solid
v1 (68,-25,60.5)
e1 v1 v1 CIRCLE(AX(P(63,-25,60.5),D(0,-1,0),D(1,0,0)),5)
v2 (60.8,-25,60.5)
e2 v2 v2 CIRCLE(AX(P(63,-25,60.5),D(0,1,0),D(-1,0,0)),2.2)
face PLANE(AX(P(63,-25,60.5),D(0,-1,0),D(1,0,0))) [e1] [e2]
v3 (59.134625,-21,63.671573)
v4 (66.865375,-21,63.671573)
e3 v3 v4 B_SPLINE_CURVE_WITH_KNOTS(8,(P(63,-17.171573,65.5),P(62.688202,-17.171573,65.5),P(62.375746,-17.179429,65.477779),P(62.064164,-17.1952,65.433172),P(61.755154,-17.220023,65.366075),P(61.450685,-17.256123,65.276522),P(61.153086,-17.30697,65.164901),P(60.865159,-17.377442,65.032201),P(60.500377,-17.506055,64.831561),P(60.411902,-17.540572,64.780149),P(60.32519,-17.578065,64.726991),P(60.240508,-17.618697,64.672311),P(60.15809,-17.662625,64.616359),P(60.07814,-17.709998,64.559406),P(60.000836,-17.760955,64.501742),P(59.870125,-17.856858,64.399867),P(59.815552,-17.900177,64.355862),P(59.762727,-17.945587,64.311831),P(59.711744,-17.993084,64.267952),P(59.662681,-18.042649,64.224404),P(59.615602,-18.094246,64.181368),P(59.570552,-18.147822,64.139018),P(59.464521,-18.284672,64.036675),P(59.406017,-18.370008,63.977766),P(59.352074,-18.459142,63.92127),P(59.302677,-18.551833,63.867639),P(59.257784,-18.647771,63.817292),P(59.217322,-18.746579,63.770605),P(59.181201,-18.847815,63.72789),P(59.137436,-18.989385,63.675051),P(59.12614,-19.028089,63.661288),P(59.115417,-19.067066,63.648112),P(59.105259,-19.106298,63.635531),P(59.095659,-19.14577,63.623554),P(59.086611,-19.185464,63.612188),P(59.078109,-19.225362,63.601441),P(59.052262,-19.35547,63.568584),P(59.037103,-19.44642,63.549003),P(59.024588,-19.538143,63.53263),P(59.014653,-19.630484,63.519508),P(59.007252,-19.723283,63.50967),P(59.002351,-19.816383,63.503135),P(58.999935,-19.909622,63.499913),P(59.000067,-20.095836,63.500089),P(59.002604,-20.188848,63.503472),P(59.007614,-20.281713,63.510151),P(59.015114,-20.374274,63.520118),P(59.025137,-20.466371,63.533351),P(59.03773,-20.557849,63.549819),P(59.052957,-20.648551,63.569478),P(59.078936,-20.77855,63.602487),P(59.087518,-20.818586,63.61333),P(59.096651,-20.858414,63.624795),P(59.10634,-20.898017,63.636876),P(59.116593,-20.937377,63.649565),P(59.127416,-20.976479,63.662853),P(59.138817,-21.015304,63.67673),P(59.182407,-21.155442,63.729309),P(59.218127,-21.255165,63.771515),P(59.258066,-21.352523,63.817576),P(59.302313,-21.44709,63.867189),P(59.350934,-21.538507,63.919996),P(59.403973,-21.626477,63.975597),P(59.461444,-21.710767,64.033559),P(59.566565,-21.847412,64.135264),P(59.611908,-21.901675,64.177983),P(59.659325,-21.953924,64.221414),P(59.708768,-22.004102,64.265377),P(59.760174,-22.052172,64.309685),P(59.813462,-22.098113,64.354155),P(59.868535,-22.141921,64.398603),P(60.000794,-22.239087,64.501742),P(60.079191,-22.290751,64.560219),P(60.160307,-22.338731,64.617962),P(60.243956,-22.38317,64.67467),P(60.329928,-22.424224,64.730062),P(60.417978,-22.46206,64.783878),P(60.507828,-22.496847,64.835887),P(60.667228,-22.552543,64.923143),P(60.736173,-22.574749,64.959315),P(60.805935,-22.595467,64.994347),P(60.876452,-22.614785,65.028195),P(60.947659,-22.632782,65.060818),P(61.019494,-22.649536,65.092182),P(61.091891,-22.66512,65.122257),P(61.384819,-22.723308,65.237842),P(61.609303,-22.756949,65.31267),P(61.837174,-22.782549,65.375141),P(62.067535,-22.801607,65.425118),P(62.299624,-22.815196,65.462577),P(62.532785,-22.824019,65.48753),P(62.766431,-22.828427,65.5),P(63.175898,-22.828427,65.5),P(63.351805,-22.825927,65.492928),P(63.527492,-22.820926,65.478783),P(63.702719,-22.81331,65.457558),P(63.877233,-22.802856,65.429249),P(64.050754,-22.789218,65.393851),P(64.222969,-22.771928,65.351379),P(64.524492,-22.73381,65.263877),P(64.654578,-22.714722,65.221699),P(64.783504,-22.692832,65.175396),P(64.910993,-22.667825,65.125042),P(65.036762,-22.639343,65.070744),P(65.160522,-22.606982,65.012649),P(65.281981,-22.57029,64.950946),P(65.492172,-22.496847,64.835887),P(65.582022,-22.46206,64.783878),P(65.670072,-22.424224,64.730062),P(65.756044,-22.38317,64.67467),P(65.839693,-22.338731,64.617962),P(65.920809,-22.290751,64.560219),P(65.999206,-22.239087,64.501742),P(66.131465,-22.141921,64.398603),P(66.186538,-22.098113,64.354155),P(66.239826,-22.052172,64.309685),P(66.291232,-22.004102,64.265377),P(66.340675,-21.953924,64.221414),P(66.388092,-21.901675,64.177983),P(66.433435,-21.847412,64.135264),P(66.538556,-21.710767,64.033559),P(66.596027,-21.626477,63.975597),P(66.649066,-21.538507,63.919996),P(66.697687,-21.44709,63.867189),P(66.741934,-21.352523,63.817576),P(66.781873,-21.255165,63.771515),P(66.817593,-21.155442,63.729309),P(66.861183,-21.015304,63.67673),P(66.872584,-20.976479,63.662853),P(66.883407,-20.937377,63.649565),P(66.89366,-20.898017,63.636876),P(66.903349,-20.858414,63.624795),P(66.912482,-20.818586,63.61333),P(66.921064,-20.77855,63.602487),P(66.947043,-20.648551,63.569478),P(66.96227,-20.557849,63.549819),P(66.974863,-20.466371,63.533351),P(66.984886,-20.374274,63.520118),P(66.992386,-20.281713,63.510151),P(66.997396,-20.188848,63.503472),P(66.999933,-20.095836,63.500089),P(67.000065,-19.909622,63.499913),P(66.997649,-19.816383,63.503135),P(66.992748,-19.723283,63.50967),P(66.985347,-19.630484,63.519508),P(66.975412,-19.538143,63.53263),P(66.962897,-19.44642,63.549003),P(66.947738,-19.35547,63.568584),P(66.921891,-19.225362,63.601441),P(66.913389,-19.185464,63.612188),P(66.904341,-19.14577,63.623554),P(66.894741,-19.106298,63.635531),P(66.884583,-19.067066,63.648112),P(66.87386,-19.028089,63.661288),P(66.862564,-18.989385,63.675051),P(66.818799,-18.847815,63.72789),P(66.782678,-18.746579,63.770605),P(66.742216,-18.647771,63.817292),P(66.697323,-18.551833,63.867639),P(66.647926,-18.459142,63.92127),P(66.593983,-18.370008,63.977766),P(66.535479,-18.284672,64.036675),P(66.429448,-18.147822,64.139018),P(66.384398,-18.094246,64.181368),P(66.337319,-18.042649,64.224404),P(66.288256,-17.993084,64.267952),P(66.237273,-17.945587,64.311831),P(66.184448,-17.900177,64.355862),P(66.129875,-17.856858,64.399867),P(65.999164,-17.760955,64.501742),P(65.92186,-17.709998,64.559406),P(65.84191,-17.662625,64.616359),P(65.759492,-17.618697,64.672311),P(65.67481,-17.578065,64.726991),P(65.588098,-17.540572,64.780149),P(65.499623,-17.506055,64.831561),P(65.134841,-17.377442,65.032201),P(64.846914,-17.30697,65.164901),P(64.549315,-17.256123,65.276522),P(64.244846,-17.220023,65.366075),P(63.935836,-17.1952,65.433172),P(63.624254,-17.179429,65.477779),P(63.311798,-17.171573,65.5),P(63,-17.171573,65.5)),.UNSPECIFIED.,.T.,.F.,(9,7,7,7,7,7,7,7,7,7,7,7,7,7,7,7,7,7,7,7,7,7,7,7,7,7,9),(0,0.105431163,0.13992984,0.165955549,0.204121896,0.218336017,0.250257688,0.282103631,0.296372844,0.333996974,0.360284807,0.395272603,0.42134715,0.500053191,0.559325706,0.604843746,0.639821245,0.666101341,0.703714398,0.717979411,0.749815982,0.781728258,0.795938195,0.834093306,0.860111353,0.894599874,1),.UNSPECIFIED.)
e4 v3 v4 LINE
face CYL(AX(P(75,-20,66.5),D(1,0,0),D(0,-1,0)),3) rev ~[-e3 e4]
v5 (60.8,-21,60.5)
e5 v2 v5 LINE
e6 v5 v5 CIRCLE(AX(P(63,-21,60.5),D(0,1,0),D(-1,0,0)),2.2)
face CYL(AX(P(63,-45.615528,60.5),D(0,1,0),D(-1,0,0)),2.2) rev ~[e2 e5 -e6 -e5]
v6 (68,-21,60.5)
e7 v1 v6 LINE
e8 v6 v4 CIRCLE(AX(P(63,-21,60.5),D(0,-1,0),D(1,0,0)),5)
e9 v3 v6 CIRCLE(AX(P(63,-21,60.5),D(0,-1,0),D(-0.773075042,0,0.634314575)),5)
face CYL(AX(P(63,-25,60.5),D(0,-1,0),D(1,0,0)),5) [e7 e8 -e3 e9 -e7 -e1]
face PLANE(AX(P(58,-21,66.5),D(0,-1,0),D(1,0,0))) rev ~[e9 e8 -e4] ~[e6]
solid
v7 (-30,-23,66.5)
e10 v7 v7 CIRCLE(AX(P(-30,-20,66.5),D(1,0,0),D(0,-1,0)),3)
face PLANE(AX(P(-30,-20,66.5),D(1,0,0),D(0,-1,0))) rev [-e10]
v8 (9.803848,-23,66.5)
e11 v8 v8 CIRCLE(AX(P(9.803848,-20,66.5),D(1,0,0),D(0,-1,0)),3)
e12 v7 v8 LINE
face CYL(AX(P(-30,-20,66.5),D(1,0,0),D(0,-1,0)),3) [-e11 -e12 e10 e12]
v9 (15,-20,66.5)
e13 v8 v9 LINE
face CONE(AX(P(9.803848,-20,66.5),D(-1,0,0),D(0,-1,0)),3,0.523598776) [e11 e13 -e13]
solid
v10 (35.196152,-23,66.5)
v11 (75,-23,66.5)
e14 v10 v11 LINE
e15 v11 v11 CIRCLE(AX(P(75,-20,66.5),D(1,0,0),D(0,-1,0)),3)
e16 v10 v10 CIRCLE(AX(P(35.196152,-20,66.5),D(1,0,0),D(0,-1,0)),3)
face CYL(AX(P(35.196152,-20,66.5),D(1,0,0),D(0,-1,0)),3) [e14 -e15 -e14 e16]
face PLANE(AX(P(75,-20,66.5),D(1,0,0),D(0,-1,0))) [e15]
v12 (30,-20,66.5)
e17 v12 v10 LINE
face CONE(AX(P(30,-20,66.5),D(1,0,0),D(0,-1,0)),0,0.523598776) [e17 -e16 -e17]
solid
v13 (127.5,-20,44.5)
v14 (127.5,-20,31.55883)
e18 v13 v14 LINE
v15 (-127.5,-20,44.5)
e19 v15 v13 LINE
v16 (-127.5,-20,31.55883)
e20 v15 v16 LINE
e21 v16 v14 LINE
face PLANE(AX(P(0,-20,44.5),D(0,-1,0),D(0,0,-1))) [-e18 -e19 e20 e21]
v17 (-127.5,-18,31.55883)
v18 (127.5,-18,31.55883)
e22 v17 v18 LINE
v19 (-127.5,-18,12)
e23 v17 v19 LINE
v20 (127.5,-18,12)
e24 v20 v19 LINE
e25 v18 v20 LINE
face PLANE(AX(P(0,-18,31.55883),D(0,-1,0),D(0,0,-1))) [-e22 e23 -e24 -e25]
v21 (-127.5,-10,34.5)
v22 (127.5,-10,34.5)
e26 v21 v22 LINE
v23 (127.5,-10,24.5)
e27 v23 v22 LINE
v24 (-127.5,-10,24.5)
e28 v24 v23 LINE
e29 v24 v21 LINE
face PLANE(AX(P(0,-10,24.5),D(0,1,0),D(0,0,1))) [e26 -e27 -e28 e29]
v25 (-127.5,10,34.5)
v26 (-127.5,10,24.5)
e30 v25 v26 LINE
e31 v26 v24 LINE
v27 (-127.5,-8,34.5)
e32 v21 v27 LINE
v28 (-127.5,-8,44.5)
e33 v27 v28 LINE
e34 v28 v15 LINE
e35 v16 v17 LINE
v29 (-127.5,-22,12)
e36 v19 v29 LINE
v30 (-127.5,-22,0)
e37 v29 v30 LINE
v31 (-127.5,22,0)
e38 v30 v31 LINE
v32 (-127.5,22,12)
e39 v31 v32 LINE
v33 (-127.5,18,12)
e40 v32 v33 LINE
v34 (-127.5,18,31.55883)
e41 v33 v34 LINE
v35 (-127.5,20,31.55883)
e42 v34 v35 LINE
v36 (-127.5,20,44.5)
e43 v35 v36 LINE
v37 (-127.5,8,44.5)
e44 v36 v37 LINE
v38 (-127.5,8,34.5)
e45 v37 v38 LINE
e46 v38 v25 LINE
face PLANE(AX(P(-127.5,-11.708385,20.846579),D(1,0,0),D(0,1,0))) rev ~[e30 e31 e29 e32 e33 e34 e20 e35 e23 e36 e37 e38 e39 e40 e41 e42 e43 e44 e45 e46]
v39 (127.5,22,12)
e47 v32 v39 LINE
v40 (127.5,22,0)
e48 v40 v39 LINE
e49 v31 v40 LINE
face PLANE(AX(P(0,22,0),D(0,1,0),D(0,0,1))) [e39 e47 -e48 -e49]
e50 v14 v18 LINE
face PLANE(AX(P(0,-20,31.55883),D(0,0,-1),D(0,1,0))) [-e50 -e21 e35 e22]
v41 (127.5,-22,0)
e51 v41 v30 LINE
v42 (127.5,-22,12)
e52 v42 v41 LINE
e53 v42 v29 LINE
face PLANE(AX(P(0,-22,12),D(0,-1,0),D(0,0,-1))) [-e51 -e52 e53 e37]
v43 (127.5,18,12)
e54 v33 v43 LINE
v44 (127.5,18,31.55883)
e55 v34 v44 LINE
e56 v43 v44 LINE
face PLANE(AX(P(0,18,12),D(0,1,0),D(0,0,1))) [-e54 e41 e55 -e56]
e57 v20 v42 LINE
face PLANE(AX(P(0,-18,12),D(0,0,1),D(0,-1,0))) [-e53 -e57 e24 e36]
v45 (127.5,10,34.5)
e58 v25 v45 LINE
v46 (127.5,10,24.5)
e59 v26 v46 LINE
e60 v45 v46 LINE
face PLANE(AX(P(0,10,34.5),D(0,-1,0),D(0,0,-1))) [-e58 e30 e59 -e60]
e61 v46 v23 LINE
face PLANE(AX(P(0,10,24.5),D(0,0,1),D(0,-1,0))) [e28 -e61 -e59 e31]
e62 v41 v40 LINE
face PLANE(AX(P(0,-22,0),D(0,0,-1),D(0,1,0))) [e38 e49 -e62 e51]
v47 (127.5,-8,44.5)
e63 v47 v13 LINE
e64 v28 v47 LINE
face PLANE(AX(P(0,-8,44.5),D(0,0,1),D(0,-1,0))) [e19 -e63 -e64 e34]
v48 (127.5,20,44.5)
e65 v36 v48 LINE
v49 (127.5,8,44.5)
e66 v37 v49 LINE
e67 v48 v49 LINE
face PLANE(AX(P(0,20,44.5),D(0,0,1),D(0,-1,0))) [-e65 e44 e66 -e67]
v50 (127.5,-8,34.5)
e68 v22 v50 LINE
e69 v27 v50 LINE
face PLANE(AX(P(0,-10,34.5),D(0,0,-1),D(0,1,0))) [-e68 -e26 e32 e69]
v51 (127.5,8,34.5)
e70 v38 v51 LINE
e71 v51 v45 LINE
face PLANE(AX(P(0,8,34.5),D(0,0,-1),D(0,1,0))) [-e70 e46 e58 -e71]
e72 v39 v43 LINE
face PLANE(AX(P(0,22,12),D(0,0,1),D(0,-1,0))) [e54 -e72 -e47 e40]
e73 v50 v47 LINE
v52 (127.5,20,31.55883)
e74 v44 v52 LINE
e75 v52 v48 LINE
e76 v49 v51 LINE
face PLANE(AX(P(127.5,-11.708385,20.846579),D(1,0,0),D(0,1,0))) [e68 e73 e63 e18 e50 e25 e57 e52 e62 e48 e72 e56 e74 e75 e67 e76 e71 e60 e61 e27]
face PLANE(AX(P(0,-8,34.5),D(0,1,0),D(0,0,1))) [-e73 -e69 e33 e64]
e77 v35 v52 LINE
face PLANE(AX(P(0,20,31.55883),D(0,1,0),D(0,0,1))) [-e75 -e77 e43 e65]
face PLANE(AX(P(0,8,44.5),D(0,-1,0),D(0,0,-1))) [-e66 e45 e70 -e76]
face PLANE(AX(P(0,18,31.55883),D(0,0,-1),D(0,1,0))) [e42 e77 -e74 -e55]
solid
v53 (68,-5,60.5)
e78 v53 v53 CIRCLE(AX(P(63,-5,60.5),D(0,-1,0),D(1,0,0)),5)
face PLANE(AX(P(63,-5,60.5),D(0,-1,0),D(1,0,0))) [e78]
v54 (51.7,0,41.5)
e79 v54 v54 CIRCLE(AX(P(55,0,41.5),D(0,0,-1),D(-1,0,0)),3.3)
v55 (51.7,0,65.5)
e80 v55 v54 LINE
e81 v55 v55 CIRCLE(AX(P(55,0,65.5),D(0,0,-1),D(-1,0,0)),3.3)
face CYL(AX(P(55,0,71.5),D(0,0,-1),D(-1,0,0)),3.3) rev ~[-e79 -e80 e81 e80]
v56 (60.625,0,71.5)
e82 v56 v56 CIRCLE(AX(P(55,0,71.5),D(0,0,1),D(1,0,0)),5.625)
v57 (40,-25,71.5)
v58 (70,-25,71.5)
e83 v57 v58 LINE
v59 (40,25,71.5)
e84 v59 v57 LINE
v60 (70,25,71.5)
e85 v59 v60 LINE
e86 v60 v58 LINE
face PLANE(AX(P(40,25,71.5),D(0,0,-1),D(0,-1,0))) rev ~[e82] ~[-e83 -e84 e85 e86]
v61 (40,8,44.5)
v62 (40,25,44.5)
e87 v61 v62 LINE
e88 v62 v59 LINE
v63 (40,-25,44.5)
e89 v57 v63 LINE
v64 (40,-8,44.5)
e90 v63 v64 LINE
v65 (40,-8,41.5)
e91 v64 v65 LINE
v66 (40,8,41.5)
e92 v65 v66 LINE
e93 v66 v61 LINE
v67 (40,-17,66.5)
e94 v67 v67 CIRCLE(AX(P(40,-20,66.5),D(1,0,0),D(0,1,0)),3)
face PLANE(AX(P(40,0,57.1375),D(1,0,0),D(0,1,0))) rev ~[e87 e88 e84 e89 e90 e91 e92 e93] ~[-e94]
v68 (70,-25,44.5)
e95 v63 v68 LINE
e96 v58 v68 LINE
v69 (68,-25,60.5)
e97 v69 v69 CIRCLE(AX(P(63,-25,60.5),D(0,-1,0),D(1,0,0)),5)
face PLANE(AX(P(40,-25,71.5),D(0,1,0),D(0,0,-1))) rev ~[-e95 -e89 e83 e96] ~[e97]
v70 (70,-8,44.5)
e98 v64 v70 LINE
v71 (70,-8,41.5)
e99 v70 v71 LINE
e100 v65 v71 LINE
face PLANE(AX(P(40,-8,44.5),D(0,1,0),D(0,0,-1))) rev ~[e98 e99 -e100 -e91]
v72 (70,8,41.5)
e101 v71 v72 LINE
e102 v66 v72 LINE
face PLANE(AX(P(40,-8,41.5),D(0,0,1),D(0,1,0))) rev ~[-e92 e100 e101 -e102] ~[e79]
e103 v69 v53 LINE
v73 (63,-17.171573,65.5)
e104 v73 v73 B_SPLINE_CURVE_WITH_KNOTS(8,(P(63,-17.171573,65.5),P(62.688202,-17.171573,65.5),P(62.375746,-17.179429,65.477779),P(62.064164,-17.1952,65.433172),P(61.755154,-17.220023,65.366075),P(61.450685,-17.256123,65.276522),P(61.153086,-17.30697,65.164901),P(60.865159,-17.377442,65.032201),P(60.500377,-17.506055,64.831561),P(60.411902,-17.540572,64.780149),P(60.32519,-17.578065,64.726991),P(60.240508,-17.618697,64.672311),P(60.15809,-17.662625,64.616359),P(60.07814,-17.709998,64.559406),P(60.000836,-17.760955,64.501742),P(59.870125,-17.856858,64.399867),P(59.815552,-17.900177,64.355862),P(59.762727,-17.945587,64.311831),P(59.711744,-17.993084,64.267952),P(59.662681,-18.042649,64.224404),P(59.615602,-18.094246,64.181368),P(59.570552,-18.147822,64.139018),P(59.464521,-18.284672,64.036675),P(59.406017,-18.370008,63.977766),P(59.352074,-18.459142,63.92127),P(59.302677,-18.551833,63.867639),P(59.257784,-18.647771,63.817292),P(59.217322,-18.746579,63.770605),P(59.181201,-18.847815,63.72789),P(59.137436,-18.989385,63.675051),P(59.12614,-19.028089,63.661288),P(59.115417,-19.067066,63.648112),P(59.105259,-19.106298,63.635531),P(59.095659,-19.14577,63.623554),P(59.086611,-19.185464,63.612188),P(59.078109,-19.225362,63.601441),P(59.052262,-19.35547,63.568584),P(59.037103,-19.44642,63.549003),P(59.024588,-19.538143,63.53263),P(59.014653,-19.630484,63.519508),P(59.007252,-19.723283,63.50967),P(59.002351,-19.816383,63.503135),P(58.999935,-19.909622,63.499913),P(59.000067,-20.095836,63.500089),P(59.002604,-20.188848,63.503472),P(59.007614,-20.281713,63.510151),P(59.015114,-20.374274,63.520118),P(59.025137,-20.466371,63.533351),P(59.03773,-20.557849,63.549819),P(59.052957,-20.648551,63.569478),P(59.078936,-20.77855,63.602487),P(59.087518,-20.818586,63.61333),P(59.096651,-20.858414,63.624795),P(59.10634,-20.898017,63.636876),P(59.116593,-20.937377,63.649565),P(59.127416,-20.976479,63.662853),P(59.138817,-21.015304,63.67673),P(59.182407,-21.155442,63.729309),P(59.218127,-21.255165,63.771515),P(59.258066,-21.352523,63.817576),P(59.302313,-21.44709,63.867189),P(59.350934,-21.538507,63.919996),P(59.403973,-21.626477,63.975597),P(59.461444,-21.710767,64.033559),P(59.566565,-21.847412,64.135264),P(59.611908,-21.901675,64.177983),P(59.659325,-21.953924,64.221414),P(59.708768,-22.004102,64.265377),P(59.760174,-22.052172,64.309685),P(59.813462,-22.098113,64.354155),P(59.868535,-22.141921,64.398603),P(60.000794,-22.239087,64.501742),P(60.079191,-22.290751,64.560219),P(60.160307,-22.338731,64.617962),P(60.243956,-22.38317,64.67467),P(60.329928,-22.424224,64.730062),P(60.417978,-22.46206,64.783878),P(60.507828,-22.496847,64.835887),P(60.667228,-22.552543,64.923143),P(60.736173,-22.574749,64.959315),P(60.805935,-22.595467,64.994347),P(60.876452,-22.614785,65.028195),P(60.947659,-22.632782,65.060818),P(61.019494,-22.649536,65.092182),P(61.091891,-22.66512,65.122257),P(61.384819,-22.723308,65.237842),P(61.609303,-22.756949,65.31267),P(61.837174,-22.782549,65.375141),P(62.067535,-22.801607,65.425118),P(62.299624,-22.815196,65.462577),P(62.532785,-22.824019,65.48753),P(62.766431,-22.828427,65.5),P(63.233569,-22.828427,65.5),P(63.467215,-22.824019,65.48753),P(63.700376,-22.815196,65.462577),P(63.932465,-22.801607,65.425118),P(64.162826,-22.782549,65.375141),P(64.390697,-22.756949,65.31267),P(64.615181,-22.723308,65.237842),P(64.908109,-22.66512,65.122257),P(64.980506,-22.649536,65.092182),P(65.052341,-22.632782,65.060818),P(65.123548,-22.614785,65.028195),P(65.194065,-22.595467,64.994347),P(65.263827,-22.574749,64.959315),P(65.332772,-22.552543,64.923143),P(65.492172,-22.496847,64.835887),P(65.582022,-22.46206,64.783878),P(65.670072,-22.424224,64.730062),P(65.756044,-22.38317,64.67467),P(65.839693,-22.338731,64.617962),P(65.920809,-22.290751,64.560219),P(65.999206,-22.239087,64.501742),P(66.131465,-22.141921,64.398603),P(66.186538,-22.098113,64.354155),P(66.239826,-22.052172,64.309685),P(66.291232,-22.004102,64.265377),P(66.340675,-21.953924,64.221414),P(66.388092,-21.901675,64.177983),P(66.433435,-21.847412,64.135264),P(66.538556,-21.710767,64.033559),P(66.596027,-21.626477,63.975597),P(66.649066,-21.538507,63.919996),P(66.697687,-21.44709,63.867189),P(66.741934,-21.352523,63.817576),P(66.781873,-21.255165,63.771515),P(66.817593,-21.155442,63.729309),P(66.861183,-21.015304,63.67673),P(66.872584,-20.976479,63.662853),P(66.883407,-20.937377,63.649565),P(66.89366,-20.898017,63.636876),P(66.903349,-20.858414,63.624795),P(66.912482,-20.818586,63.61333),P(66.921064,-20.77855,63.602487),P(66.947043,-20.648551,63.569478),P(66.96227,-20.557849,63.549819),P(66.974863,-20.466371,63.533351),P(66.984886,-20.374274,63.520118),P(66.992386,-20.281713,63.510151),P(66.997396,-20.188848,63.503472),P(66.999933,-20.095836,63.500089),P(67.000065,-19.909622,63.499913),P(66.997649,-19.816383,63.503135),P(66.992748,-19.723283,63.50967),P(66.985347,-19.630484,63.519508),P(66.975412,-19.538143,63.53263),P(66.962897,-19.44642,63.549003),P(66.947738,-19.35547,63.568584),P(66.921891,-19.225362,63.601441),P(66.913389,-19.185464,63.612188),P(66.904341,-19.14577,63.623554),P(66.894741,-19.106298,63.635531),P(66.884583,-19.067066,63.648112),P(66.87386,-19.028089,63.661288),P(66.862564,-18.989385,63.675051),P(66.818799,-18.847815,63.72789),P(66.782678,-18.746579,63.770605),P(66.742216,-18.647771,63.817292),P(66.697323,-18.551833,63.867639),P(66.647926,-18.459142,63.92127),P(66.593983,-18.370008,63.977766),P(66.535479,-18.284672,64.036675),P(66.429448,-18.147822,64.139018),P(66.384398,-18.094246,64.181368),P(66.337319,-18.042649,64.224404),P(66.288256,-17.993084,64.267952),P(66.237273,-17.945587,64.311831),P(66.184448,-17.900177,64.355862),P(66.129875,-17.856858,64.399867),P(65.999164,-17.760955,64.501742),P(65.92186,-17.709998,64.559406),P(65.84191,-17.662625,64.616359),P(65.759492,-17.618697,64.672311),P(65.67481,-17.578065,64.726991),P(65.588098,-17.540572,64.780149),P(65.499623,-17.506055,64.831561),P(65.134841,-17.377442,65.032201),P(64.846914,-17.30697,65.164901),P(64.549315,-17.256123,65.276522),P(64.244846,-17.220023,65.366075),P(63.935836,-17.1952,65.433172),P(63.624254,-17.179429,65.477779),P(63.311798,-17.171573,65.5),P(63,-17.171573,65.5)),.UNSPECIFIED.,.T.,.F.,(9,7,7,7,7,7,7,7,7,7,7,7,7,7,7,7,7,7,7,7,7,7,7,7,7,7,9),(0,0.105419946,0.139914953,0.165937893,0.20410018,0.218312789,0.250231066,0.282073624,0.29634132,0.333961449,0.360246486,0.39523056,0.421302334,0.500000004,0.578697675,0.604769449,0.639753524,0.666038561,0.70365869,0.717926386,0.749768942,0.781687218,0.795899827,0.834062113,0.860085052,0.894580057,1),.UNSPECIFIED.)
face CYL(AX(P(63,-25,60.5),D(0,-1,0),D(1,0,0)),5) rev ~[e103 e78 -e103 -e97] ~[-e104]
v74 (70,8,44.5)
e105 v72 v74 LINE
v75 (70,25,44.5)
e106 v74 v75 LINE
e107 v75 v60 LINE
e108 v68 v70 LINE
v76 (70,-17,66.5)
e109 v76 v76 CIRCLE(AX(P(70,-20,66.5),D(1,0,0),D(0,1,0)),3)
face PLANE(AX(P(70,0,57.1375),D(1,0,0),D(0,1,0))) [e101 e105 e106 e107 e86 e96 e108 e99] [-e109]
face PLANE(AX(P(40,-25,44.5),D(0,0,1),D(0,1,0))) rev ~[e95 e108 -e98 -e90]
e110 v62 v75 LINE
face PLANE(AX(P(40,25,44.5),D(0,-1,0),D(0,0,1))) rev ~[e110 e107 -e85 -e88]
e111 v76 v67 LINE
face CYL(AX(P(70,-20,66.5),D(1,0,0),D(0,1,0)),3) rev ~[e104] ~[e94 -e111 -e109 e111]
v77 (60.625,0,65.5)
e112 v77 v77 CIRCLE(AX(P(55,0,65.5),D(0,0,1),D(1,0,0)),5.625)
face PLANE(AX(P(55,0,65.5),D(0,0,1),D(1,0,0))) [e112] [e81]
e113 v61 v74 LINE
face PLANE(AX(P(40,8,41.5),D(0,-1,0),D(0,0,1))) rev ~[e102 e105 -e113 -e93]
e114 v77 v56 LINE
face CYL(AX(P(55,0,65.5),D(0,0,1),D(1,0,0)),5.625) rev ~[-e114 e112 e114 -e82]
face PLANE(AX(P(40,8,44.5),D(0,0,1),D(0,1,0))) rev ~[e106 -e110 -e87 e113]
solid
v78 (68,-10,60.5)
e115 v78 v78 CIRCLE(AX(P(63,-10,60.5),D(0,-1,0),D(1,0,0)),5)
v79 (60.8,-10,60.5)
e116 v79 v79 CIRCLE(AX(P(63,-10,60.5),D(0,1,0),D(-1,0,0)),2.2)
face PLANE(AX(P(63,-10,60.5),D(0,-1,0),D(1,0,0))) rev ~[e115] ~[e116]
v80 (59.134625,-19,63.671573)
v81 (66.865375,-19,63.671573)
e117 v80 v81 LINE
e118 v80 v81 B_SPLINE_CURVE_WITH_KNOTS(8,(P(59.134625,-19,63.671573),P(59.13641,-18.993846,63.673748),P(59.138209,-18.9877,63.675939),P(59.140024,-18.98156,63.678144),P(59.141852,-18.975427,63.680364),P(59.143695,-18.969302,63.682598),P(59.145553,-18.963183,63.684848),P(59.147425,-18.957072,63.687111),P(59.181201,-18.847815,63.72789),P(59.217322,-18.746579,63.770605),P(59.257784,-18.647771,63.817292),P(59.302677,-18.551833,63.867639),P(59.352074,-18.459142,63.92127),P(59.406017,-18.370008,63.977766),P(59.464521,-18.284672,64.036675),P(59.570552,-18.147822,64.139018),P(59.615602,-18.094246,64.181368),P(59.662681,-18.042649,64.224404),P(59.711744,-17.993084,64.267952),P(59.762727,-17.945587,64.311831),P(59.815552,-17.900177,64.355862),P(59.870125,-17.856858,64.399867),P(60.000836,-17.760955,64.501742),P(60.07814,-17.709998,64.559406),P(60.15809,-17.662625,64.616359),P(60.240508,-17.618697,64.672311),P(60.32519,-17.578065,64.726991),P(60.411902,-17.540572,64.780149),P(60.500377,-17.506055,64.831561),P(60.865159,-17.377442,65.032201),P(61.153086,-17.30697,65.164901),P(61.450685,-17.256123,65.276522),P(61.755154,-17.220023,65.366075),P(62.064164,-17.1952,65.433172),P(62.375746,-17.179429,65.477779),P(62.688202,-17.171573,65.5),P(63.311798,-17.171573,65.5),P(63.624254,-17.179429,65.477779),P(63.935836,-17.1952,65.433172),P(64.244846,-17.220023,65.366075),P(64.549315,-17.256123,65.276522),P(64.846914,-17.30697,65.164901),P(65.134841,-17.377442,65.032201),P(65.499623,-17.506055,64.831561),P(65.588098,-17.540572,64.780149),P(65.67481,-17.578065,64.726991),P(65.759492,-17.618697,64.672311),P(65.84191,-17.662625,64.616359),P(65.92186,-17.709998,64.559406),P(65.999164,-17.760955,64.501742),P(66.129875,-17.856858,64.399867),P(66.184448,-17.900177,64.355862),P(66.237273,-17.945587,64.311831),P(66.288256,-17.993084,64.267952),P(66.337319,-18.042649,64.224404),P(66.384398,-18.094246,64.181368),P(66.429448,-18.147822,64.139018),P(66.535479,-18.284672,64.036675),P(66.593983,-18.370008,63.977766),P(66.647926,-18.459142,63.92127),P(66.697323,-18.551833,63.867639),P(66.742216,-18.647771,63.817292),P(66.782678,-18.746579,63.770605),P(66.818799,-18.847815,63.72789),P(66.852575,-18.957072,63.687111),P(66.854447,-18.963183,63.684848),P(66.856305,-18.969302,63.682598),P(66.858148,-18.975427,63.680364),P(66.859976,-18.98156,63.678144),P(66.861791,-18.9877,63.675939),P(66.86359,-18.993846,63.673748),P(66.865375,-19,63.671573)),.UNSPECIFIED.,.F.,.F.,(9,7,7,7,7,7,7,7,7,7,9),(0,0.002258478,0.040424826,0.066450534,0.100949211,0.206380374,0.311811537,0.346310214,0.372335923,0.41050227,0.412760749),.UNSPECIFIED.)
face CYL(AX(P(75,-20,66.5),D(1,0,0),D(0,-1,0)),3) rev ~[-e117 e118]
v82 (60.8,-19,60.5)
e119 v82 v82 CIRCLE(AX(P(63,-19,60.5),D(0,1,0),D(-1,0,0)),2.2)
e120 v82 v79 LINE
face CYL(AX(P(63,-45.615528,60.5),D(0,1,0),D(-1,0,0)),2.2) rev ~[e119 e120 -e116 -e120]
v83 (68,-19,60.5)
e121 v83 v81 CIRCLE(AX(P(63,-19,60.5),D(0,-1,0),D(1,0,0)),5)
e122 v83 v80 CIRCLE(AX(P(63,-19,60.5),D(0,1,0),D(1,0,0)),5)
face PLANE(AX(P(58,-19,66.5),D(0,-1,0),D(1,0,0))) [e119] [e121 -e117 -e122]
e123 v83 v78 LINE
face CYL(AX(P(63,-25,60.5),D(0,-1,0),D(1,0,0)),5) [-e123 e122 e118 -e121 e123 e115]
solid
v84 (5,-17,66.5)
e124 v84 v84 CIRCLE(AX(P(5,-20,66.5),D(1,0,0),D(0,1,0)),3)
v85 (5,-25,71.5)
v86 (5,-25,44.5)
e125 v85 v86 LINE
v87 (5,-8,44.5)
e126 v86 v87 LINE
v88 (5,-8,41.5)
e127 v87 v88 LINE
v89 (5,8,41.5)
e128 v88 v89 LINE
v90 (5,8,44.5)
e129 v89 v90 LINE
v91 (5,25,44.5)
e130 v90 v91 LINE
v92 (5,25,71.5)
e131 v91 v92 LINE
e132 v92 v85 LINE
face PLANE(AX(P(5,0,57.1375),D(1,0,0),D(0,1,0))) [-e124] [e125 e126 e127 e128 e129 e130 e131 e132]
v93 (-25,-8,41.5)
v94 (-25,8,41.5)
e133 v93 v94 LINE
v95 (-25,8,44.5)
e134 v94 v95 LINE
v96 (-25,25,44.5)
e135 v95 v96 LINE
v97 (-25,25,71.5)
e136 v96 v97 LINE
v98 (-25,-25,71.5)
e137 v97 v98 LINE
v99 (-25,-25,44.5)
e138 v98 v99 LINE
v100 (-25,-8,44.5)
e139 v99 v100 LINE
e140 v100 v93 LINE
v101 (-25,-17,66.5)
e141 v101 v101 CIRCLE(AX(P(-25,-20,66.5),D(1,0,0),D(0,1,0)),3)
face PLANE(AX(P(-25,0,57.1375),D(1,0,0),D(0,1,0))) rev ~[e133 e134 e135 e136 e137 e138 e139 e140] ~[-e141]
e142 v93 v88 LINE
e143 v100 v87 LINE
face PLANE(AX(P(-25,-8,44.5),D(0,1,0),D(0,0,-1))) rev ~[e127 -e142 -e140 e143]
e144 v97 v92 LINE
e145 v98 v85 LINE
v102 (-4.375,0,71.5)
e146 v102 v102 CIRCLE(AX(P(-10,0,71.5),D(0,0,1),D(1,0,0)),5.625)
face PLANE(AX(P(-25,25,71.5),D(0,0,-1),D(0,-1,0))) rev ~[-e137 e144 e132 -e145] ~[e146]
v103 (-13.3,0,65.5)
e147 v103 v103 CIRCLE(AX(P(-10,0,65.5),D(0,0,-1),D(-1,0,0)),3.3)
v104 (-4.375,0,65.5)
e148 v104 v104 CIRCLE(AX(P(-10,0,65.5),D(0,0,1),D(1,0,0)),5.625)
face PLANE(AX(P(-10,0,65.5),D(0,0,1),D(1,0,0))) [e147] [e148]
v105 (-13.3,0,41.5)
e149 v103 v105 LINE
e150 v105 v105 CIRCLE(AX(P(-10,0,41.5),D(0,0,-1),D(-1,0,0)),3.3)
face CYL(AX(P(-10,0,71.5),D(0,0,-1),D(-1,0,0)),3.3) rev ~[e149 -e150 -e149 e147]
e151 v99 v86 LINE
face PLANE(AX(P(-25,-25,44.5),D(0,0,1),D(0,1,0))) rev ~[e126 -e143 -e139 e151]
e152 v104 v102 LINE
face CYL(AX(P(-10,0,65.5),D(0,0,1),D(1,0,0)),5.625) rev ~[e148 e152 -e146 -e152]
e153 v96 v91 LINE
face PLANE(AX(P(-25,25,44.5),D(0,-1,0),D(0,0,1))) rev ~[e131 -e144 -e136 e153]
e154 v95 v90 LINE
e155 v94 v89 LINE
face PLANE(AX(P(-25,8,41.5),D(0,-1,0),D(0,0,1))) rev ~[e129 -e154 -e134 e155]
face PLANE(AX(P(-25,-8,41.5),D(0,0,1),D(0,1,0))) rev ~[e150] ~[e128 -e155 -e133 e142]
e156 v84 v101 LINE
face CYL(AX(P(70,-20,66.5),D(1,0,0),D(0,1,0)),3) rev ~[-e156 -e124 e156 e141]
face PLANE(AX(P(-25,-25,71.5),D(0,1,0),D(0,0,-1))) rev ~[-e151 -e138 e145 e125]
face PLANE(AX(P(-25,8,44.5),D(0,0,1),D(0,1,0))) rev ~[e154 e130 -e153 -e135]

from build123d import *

# Parameters (mm, degrees)
F1_DEPTH        = 127.5
F5_DEPTH        = 30
F7_DEPTH        = 30
F8_R            = 3
F9_DEPTH        = 197.501
F10_R           = 3
F11_DEPTH       = 132.501
F14_D           = 6.6
F14_CBORE_D     = 11.25
F14_CBORE_DEPTH = 6
F15_D           = 6.6
F15_CBORE_D     = 11.25
F15_CBORE_DEPTH = 6
F20_R           = 5
F20_R_2         = 2
F21_DEPTH       = 20
F22_DEPTH       = 15
F23_D           = 4.4
F24_DEPTH       = 202.501
F25_W           = 10
F25_H           = 2
F26_DEPTH       = 66.501


with BuildPart() as f1:
    # F0 (on Right) → F1 (new body, symmetric)
    with BuildSketch(Plane.YZ):
        Polygon((-22, 0), (0, 0), (0, 24.5), (-10, 24.5), (-10, 34.5), (-8, 34.5), (-8, 41.5), (-8, 44.5), (-20, 44.5), (-20, 31.5588298937), (-18, 31.5588298937), (-18, 12), (-22, 12), align=None)
        Polygon((0, 24.5), (0, 0), (22, 0), (22, 12), (18, 12), (18, 31.5588298937), (20, 31.5588298937), (20, 44.5), (8, 44.5), (8, 41.5), (8, 34.5), (10, 34.5), (10, 24.5), align=None)
    extrude(amount=F1_DEPTH, both=True)

    # F10 (on face) → F11 (cut, through all)
    with BuildSketch(Plane.YZ.offset(5)):
        with Locations((-20, 66.5)):
            Circle(F10_R)
    extrude(amount=-F11_DEPTH, mode=Mode.SUBTRACT)


with BuildPart() as f5:
    # F4 (on offset) → F5 (new body)
    with BuildSketch(Plane.YZ.offset(40)):
        Polygon((-25, 71.5), (-25, 44.5), (-8, 44.5), (-8, 41.5), (8, 41.5), (8, 44.5), (25, 44.5), (25, 71.5), align=None)
    extrude(amount=F5_DEPTH)


with BuildPart() as f7:
    # F6 (on offset) → F7 (new body)
    with BuildSketch(Plane.YZ.offset(-25)):
        Polygon((-8, 41.5), (8, 41.5), (8, 44.5), (20, 44.5), (25, 44.5), (25, 71.5), (-25, 71.5), (-25, 44.5), (-20, 44.5), (-8, 44.5), align=None)
    extrude(amount=F7_DEPTH)


with BuildPart() as f9_tool:
    # F8 (on face) → F9 (new body, through all)
    with BuildSketch(Plane.YZ.offset(70)):
        with Locations((-20, 66.5)):
            Circle(F8_R)
    extrude(amount=-F9_DEPTH)


with BuildPart() as f5_1:
    add(f5.part)

    # F9: cut by f9_tool
    add(f9_tool.part, mode=Mode.SUBTRACT)

    # F15 (through all)
    with Locations(Plane.XY.offset(71.5)):
        with Locations((55, 0)):
            CounterBoreHole(F15_D / 2, F15_CBORE_D / 2, F15_CBORE_DEPTH)

    # F20 (on face) → F21 (cut)
    with BuildSketch(Plane.XZ.offset(25)):
        with Locations((63, 60.5)):
            Circle(F20_R)
        with Locations((63, 60.5)):
            Circle(F20_R_2, mode=Mode.SUBTRACT)
        with Locations((63, 60.5)):
            Circle(F20_R_2)
    extrude(amount=-F21_DEPTH, mode=Mode.SUBTRACT)


with BuildPart() as f7_1:
    add(f7.part)

    # F9: cut by f9_tool
    add(f9_tool.part, mode=Mode.SUBTRACT)

    # F14 (through all)
    with Locations(Plane.XY.offset(71.5)):
        with Locations((-10, 0)):
            CounterBoreHole(F14_D / 2, F14_CBORE_D / 2, F14_CBORE_DEPTH)


with BuildPart() as f18:
    # F17 (on offset) → F18 (revolve)
    with BuildSketch(Plane.XY.offset(66.5)):
        Polygon((75, -20), (30, -20), (35.1961524227, -23), (75, -23), align=None)
    revolve(axis=Axis((28.5532526373, -20, 66.5), (1, 0, 0)))


with BuildPart() as f19:
    # F17 (on offset) → F19 (revolve)
    with BuildSketch(Plane.XY.offset(66.5)):
        Polygon((15, -20), (-30, -20), (-30, -23), (9.8038475773, -23), align=None)
    revolve(axis=Axis((-7.5, -20, 66.5), (1, 0, 0)))


with BuildPart() as f22:
    # F20 (on face) → F22 (new body)
    with BuildSketch(Plane.XZ.offset(25)):
        with Locations((63, 60.5)):
            Circle(F20_R)
        with Locations((63, 60.5)):
            Circle(F20_R_2, mode=Mode.SUBTRACT)
        with Locations((63, 60.5)):
            Circle(F20_R_2)
    extrude(amount=-F22_DEPTH)

    # F23 (through all)
    with Locations(Plane.XZ.offset(25)):
        with Locations((63, 60.5)):
            Hole(F23_D / 2)

    # F24 (cut, through all): a face of the model
    f24_faces = [f18.part.faces().sort_by_distance(p)[0] for p in [
        (75, -20, 66.5),
    ]]
    extrude(f24_faces, amount=-F24_DEPTH, mode=Mode.SUBTRACT)

    # F25 (on offset) → F26 (cut, through all)
    with BuildSketch(Plane.XY.offset(66.5)):
        with Locations((63, -20)):
            Rectangle(F25_W, F25_H)
    extrude(amount=-F26_DEPTH, mode=Mode.SUBTRACT)


solid = Compound([f1.part, f5_1.part, f7_1.part, f18.part, f19.part, f22.part])
